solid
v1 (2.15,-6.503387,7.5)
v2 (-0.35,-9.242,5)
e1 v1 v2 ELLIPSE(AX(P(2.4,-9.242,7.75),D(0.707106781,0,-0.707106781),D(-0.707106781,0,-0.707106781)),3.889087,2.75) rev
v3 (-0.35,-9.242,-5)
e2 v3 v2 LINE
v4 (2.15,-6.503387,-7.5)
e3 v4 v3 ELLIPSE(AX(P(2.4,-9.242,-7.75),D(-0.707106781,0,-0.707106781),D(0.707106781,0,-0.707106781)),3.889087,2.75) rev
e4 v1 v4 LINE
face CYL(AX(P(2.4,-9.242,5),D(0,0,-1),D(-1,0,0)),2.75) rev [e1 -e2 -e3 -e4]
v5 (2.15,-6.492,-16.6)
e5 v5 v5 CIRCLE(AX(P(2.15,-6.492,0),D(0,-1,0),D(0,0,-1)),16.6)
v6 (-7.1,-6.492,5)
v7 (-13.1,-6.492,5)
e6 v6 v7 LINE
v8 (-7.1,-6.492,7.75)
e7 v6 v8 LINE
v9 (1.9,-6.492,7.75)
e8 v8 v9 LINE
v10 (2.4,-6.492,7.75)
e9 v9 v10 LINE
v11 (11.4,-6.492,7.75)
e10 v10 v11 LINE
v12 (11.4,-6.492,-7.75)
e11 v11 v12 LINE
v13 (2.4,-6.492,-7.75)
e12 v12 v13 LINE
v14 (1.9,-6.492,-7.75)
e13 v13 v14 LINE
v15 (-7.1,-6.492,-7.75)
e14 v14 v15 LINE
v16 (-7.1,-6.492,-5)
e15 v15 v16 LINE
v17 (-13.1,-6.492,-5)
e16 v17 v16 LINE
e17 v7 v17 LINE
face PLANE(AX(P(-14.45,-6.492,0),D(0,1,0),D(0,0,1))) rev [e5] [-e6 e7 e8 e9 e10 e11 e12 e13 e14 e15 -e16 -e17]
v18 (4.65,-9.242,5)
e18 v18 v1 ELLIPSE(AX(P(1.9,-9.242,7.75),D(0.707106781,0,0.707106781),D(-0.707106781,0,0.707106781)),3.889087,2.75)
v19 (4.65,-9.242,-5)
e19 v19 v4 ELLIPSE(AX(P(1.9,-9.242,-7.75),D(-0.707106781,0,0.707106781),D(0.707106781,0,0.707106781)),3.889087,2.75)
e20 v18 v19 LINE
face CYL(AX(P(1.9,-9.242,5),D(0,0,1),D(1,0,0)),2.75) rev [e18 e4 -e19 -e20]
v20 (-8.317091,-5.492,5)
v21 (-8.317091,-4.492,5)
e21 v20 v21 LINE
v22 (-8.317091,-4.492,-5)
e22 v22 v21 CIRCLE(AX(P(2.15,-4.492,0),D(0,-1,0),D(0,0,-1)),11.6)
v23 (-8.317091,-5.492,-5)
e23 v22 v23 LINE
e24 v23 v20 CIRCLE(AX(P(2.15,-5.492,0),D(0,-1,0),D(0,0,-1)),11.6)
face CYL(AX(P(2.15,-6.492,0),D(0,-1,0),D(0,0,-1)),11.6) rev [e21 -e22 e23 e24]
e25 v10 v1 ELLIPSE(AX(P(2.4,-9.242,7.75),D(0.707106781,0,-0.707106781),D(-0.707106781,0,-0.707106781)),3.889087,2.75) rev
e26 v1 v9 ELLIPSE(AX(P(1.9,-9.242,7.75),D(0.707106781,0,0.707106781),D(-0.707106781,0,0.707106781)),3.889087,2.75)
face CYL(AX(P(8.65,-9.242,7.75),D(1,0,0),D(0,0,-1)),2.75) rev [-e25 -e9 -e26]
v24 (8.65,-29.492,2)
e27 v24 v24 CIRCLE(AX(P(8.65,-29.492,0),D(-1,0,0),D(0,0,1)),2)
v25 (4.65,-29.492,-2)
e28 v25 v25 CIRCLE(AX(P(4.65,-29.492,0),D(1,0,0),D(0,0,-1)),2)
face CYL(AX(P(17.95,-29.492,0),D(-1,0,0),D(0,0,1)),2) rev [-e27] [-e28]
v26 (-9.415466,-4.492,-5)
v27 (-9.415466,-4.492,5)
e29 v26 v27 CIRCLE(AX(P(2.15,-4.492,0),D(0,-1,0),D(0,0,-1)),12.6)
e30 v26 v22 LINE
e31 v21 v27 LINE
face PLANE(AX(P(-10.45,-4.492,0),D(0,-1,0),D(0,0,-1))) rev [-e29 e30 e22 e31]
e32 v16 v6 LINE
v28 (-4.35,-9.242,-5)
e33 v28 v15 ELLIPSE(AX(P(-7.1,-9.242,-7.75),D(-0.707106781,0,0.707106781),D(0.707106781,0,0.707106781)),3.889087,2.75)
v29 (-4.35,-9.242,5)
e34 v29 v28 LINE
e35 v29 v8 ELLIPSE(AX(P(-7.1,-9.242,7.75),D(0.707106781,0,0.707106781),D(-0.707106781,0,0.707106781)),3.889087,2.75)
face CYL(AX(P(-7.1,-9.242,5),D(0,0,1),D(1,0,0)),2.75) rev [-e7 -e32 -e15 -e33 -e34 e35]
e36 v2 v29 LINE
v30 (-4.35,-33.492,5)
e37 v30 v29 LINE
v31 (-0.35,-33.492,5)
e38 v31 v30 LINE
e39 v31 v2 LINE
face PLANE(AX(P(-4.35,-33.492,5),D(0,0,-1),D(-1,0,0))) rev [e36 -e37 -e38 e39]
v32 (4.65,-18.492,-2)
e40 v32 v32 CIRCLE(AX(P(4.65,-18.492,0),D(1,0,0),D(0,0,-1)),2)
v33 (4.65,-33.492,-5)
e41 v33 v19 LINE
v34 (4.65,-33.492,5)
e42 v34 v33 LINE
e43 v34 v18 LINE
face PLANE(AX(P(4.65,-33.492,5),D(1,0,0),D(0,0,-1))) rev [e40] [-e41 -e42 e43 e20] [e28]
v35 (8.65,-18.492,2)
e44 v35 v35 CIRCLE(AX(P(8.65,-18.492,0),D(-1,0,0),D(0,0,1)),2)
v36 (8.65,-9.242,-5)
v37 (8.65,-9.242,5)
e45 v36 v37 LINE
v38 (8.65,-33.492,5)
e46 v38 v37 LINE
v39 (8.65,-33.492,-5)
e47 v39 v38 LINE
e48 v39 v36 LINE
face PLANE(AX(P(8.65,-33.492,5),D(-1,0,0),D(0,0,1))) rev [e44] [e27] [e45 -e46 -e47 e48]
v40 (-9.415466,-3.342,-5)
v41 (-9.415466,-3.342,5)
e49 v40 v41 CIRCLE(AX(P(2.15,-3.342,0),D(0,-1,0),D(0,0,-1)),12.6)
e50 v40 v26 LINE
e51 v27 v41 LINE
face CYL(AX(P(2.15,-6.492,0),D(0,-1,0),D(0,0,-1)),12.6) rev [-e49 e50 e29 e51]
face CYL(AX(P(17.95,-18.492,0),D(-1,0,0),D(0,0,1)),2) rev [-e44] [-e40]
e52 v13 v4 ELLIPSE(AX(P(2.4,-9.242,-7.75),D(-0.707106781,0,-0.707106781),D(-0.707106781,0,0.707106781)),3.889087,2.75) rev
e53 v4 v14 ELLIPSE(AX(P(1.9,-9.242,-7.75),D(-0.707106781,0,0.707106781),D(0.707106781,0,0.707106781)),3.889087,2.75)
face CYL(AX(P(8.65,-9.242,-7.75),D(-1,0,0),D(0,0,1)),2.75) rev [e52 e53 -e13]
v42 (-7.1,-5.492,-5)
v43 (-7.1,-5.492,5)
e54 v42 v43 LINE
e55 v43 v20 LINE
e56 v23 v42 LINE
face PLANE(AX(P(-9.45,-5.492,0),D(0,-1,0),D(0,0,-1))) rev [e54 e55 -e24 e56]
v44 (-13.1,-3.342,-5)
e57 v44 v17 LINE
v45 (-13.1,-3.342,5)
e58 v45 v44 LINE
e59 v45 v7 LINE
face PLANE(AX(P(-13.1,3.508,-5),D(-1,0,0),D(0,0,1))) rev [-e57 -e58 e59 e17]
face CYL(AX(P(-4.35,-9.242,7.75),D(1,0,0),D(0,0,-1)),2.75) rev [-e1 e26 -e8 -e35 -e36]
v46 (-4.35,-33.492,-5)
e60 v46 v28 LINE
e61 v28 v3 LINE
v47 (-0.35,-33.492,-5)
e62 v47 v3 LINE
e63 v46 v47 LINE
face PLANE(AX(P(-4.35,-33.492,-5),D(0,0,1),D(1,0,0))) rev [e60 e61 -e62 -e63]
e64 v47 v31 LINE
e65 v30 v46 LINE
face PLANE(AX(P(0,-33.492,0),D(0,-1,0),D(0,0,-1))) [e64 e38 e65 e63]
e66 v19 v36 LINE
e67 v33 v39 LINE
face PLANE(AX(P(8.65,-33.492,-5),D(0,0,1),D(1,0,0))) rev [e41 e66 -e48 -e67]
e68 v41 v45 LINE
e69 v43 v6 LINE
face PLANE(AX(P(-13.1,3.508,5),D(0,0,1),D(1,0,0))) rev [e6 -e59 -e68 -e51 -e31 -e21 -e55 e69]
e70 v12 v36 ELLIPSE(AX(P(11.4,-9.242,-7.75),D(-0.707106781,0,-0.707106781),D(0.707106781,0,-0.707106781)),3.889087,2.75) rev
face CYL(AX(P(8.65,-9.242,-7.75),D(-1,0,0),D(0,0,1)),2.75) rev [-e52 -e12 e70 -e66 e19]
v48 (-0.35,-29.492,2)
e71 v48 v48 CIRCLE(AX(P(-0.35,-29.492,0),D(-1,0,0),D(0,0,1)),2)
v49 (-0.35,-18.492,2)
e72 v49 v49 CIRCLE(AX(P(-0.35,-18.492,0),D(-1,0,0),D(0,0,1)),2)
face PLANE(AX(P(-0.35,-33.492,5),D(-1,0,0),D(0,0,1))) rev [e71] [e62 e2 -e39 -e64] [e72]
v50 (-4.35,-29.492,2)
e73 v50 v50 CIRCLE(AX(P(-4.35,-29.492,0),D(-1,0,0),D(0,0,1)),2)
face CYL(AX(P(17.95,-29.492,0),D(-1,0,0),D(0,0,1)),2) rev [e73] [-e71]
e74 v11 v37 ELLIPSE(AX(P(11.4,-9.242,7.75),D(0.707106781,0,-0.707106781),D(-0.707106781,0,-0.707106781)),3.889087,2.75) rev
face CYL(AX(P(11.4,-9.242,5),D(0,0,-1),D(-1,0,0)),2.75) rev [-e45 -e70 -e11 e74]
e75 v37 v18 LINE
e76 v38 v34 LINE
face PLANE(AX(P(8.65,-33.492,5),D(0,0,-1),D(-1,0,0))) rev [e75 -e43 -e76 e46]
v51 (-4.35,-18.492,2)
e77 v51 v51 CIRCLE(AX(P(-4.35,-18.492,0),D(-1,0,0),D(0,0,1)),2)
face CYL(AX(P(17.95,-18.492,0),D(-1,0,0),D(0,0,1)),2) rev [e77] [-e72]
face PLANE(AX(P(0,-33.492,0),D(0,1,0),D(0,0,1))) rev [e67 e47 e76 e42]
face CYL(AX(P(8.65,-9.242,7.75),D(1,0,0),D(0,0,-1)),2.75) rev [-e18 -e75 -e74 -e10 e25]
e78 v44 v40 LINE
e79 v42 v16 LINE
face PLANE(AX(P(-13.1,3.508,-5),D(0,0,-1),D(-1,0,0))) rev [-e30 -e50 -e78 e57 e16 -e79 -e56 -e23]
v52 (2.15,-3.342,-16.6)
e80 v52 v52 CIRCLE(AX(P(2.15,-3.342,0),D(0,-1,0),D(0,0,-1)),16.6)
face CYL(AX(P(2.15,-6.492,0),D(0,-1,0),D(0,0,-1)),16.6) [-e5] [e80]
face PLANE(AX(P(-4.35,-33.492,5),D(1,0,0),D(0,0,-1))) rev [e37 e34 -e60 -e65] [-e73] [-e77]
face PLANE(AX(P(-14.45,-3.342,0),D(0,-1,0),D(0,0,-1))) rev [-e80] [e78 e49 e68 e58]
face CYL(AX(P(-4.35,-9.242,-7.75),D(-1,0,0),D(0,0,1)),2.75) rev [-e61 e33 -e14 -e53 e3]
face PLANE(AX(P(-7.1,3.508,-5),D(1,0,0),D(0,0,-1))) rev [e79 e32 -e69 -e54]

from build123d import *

# Parameters (mm, degrees)
SKETCH2_W           = 4
SKETCH2_H           = 10
BOSS_EXTRUDE1_DEPTH = 27
SKETCH3_R           = 2
CUT_EXTRUDE1_DEPTH  = 22.3
FILLET1_R           = 2.75
SKETCH6_W           = 6
SKETCH6_H           = 10
CUT_EXTRUDE4_DEPTH  = 10


with BuildPart() as part:
    # Sketch1 → Revolve1 (revolve)
    with BuildSketch(Plane.XY, mode=Mode.PRIVATE) as revolve1_sk:
        Polygon((-14.45, -3.342), (-10.45, -3.342), (-10.45, -4.492), (-9.45, -4.492), (-9.45, -5.492), (2.15, -5.492), (2.15, -6.492), (-14.45, -6.492), align=None)
    revolve(revolve1_sk.sketch.rotate(Axis((2.15, -6.492, 0), (0, 1, 0)), 270), axis=Axis((2.15, -6.492, 0), (0, 1, 0)))

    # Sketch2 → Boss-Extrude1 (add)
    with BuildSketch(Plane.XZ.offset(6.492)):
        with Locations((6.65, 0)):
            Rectangle(SKETCH2_W, SKETCH2_H)
        with Locations((-2.35, 0)):
            Rectangle(SKETCH2_W, SKETCH2_H)
    extrude(amount=BOSS_EXTRUDE1_DEPTH)

    # Sketch3 → Cut-Extrude1 (cut)
    with BuildSketch(Plane.ZY.offset(4.35)):
        with Locations((0, -29.492)):
            Circle(SKETCH3_R)
        with Locations((0, -18.492)):
            Circle(SKETCH3_R)
    extrude(amount=-CUT_EXTRUDE1_DEPTH, mode=Mode.SUBTRACT)

    # Fillet1
    # the kernel refuses this fillet: 2.75 mm, written as the material it adds along each edge
    with BuildSketch(Plane(origin=(-4.35, -6.492, -5), x_dir=(-1, 0, 0), z_dir=(0, 0, 1)), Plane(origin=(-0.35, -6.492, 5), x_dir=(1, 0, 0), z_dir=(0, 0, -1)), Plane(origin=(8.65, -6.492, 5), x_dir=(1, 0, 0), z_dir=(0, 0, -1)), Plane(origin=(4.65, -6.492, -5), x_dir=(-1, 0, 0), z_dir=(0, 0, 1))) as fillet1_piece_1:
        with BuildLine():
            CenterArc((FILLET1_R, FILLET1_R), FILLET1_R, 180, 90)
            Line((0, FILLET1_R), (0, 0))
            Line((0, 0), (FILLET1_R, 0))
        make_face()
    extrude(amount=10)
    with BuildSketch(Plane(origin=(6.525, -6.492, -5), x_dir=(0, 0, -1), z_dir=(-1, 0, 0))) as fillet1_piece_2_section:
        with BuildLine():
            CenterArc((FILLET1_R, FILLET1_R), FILLET1_R, 180, 90)
            Line((0, FILLET1_R), (0, 0))
            Line((0, 0), (FILLET1_R, 0))
        make_face()
    fillet1_piece_2 = extrude(amount=10.875, mode=Mode.PRIVATE)
    fillet1_piece_2 = split(fillet1_piece_2, bisect_by=Plane(origin=(4.65, -7.114586564, -5.622586564), z_dir=(1, 0, 0)), keep=Keep.TOP, mode=Mode.PRIVATE)
    add(fillet1_piece_2)
    with BuildSketch(Plane(origin=(-0.35, -6.492, -5), x_dir=(0, 0, -1), z_dir=(-1, 0, 0)), Plane(origin=(-4.35, -6.492, 5), x_dir=(0, 0, 1), z_dir=(1, 0, 0)), Plane(origin=(4.65, -6.492, 5), x_dir=(0, 0, 1), z_dir=(1, 0, 0)), Plane(origin=(8.65, -6.492, -5), x_dir=(0, 0, -1), z_dir=(-1, 0, 0))) as fillet1_piece_3:
        with BuildLine():
            CenterArc((FILLET1_R, FILLET1_R), FILLET1_R, 180, 90)
            Line((0, FILLET1_R), (0, 0))
            Line((0, 0), (FILLET1_R, 0))
        make_face()
    extrude(amount=4)
    with BuildSketch(Plane(origin=(-4.35, -6.492, 5), x_dir=(0, 0, 1), z_dir=(1, 0, 0))) as fillet1_piece_4_section:
        with BuildLine():
            CenterArc((FILLET1_R, FILLET1_R), FILLET1_R, 180, 90)
            Line((0, FILLET1_R), (0, 0))
            Line((0, 0), (FILLET1_R, 0))
        make_face()
    fillet1_piece_4 = extrude(amount=10.875, mode=Mode.PRIVATE)
    fillet1_piece_4 = split(fillet1_piece_4, bisect_by=Plane(origin=(4.65, -7.114586564, 5.622586564), z_dir=(1, 0, 0)), keep=Keep.TOP, mode=Mode.PRIVATE)
    add(fillet1_piece_4)
    with BuildSketch(Plane(origin=(-2.225, -6.492, 5), x_dir=(0, 0, 1), z_dir=(1, 0, 0))) as fillet1_piece_5_section:
        with BuildLine():
            CenterArc((FILLET1_R, FILLET1_R), FILLET1_R, 180, 90)
            Line((0, FILLET1_R), (0, 0))
            Line((0, 0), (FILLET1_R, 0))
        make_face()
    fillet1_piece_5 = extrude(amount=10.875, mode=Mode.PRIVATE)
    fillet1_piece_5 = split(fillet1_piece_5, bisect_by=Plane(origin=(-0.35, -7.114586564, 5.622586564), z_dir=(-1, 0, 0)), keep=Keep.TOP, mode=Mode.PRIVATE)
    add(fillet1_piece_5)
    with BuildSketch(Plane(origin=(8.65, -6.492, -5), x_dir=(0, 0, -1), z_dir=(-1, 0, 0))) as fillet1_piece_6_section:
        with BuildLine():
            CenterArc((FILLET1_R, FILLET1_R), FILLET1_R, 180, 90)
            Line((0, FILLET1_R), (0, 0))
            Line((0, 0), (FILLET1_R, 0))
        make_face()
    fillet1_piece_6 = extrude(amount=10.875, mode=Mode.PRIVATE)
    fillet1_piece_6 = split(fillet1_piece_6, bisect_by=Plane(origin=(-0.35, -7.114586564, -5.622586564), z_dir=(-1, 0, 0)), keep=Keep.TOP, mode=Mode.PRIVATE)
    add(fillet1_piece_6)
    with BuildSketch(Plane(origin=(-4.35, -6.492, -11.875), x_dir=(-1, 0, 0), z_dir=(0, 0, 1))) as fillet1_piece_7a_section:
        with BuildLine():
            CenterArc((FILLET1_R, FILLET1_R), FILLET1_R, 180, 90)
            Line((0, FILLET1_R), (0, 0))
            Line((0, 0), (FILLET1_R, 0))
        make_face()
    fillet1_piece_7a = extrude(amount=16.875, mode=Mode.PRIVATE)
    fillet1_piece_7a = split(fillet1_piece_7a, bisect_by=Plane(origin=(-4.972586564, -7.114586564, -5), z_dir=(0, 0, -1)), keep=Keep.TOP, mode=Mode.PRIVATE)
    with BuildSketch(Plane(origin=(-0.35, -6.492, -5), x_dir=(0, 0, -1), z_dir=(-1, 0, 0))) as fillet1_piece_7b_section:
        with BuildLine():
            CenterArc((FILLET1_R, FILLET1_R), FILLET1_R, 180, 90)
            Line((0, FILLET1_R), (0, 0))
            Line((0, 0), (FILLET1_R, 0))
        make_face()
    fillet1_piece_7b = extrude(amount=10.875, mode=Mode.PRIVATE)
    fillet1_piece_7b = split(fillet1_piece_7b, bisect_by=Plane(origin=(-4.35, -7.114586564, -5.622586564), z_dir=(-1, 0, 0)), keep=Keep.TOP, mode=Mode.PRIVATE)
    fillet1_piece_7 = fillet1_piece_7a & fillet1_piece_7b
    add(fillet1_piece_7)
    with BuildSketch(Plane(origin=(-4.35, -6.492, -5), x_dir=(-1, 0, 0), z_dir=(0, 0, 1))) as fillet1_piece_8a_section:
        with BuildLine():
            CenterArc((FILLET1_R, FILLET1_R), FILLET1_R, 180, 90)
            Line((0, FILLET1_R), (0, 0))
            Line((0, 0), (FILLET1_R, 0))
        make_face()
    fillet1_piece_8a = extrude(amount=16.875, mode=Mode.PRIVATE)
    fillet1_piece_8a = split(fillet1_piece_8a, bisect_by=Plane(origin=(-4.972586564, -7.114586564, 5), z_dir=(0, 0, 1)), keep=Keep.TOP, mode=Mode.PRIVATE)
    with BuildSketch(Plane(origin=(-11.225, -6.492, 5), x_dir=(0, 0, 1), z_dir=(1, 0, 0))) as fillet1_piece_8b_section:
        with BuildLine():
            CenterArc((FILLET1_R, FILLET1_R), FILLET1_R, 180, 90)
            Line((0, FILLET1_R), (0, 0))
            Line((0, 0), (FILLET1_R, 0))
        make_face()
    fillet1_piece_8b = extrude(amount=10.875, mode=Mode.PRIVATE)
    fillet1_piece_8b = split(fillet1_piece_8b, bisect_by=Plane(origin=(-4.35, -7.114586564, 5.622586564), z_dir=(-1, 0, 0)), keep=Keep.TOP, mode=Mode.PRIVATE)
    fillet1_piece_8 = fillet1_piece_8a & fillet1_piece_8b
    add(fillet1_piece_8)
    with BuildSketch(Plane(origin=(6.525, -6.492, -5), x_dir=(0, 0, -1), z_dir=(-1, 0, 0))) as fillet1_piece_9a_section:
        with BuildLine():
            CenterArc((FILLET1_R, FILLET1_R), FILLET1_R, 180, 90)
            Line((0, FILLET1_R), (0, 0))
            Line((0, 0), (FILLET1_R, 0))
        make_face()
    fillet1_piece_9a = extrude(amount=10.875, mode=Mode.PRIVATE)
    fillet1_piece_9a = split(fillet1_piece_9a, bisect_by=Plane(origin=(4.65, -7.114586564, -5.622586564), z_dir=(-1, 0, 0)), keep=Keep.TOP, mode=Mode.PRIVATE)
    fillet1_piece_9a = split(fillet1_piece_9a, bisect_by=Plane(origin=(-0.35, -7.114586564, -5.622586564), z_dir=(1, 0, 0)), keep=Keep.TOP, mode=Mode.PRIVATE)
    with BuildSketch(Plane(origin=(-0.35, -6.492, 5), x_dir=(1, 0, 0), z_dir=(0, 0, -1))) as fillet1_piece_9b_section:
        with BuildLine():
            CenterArc((FILLET1_R, FILLET1_R), FILLET1_R, 180, 90)
            Line((0, FILLET1_R), (0, 0))
            Line((0, 0), (FILLET1_R, 0))
        make_face()
    fillet1_piece_9b = extrude(amount=16.875, mode=Mode.PRIVATE)
    fillet1_piece_9b = split(fillet1_piece_9b, bisect_by=Plane(origin=(0.272586564, -7.114586564, -5), z_dir=(0, 0, -1)), keep=Keep.TOP, mode=Mode.PRIVATE)
    fillet1_piece_9 = fillet1_piece_9a & fillet1_piece_9b
    add(fillet1_piece_9)
    with BuildSketch(Plane(origin=(-0.35, -6.492, 11.875), x_dir=(1, 0, 0), z_dir=(0, 0, -1))) as fillet1_piece_10a_section:
        with BuildLine():
            CenterArc((FILLET1_R, FILLET1_R), FILLET1_R, 180, 90)
            Line((0, FILLET1_R), (0, 0))
            Line((0, 0), (FILLET1_R, 0))
        make_face()
    fillet1_piece_10a = extrude(amount=16.875, mode=Mode.PRIVATE)
    fillet1_piece_10a = split(fillet1_piece_10a, bisect_by=Plane(origin=(0.272586564, -7.114586564, 5), z_dir=(0, 0, 1)), keep=Keep.TOP, mode=Mode.PRIVATE)
    with BuildSketch(Plane(origin=(-4.35, -6.492, 5), x_dir=(0, 0, 1), z_dir=(1, 0, 0))) as fillet1_piece_10b_section:
        with BuildLine():
            CenterArc((FILLET1_R, FILLET1_R), FILLET1_R, 180, 90)
            Line((0, FILLET1_R), (0, 0))
            Line((0, 0), (FILLET1_R, 0))
        make_face()
    fillet1_piece_10b = extrude(amount=10.875, mode=Mode.PRIVATE)
    fillet1_piece_10b = split(fillet1_piece_10b, bisect_by=Plane(origin=(4.65, -7.114586564, 5.622586564), z_dir=(-1, 0, 0)), keep=Keep.TOP, mode=Mode.PRIVATE)
    fillet1_piece_10b = split(fillet1_piece_10b, bisect_by=Plane(origin=(-0.35, -7.114586564, 5.622586564), z_dir=(1, 0, 0)), keep=Keep.TOP, mode=Mode.PRIVATE)
    fillet1_piece_10 = fillet1_piece_10a & fillet1_piece_10b
    add(fillet1_piece_10)
    with BuildSketch(Plane(origin=(8.65, -6.492, 11.875), x_dir=(1, 0, 0), z_dir=(0, 0, -1))) as fillet1_piece_11a_section:
        with BuildLine():
            CenterArc((FILLET1_R, FILLET1_R), FILLET1_R, 180, 90)
            Line((0, FILLET1_R), (0, 0))
            Line((0, 0), (FILLET1_R, 0))
        make_face()
    fillet1_piece_11a = extrude(amount=16.875, mode=Mode.PRIVATE)
    fillet1_piece_11a = split(fillet1_piece_11a, bisect_by=Plane(origin=(9.272586564, -7.114586564, 5), z_dir=(0, 0, 1)), keep=Keep.TOP, mode=Mode.PRIVATE)
    with BuildSketch(Plane(origin=(4.65, -6.492, 5), x_dir=(0, 0, 1), z_dir=(1, 0, 0))) as fillet1_piece_11b_section:
        with BuildLine():
            CenterArc((FILLET1_R, FILLET1_R), FILLET1_R, 180, 90)
            Line((0, FILLET1_R), (0, 0))
            Line((0, 0), (FILLET1_R, 0))
        make_face()
    fillet1_piece_11b = extrude(amount=10.875, mode=Mode.PRIVATE)
    fillet1_piece_11b = split(fillet1_piece_11b, bisect_by=Plane(origin=(8.65, -7.114586564, 5.622586564), z_dir=(1, 0, 0)), keep=Keep.TOP, mode=Mode.PRIVATE)
    fillet1_piece_11 = fillet1_piece_11a & fillet1_piece_11b
    add(fillet1_piece_11)
    with BuildSketch(Plane(origin=(8.65, -6.492, 5), x_dir=(1, 0, 0), z_dir=(0, 0, -1))) as fillet1_piece_12a_section:
        with BuildLine():
            CenterArc((FILLET1_R, FILLET1_R), FILLET1_R, 180, 90)
            Line((0, FILLET1_R), (0, 0))
            Line((0, 0), (FILLET1_R, 0))
        make_face()
    fillet1_piece_12a = extrude(amount=16.875, mode=Mode.PRIVATE)
    fillet1_piece_12a = split(fillet1_piece_12a, bisect_by=Plane(origin=(9.272586564, -7.114586564, -5), z_dir=(0, 0, -1)), keep=Keep.TOP, mode=Mode.PRIVATE)
    with BuildSketch(Plane(origin=(15.525, -6.492, -5), x_dir=(0, 0, -1), z_dir=(-1, 0, 0))) as fillet1_piece_12b_section:
        with BuildLine():
            CenterArc((FILLET1_R, FILLET1_R), FILLET1_R, 180, 90)
            Line((0, FILLET1_R), (0, 0))
            Line((0, 0), (FILLET1_R, 0))
        make_face()
    fillet1_piece_12b = extrude(amount=10.875, mode=Mode.PRIVATE)
    fillet1_piece_12b = split(fillet1_piece_12b, bisect_by=Plane(origin=(8.65, -7.114586564, -5.622586564), z_dir=(1, 0, 0)), keep=Keep.TOP, mode=Mode.PRIVATE)
    fillet1_piece_12 = fillet1_piece_12a & fillet1_piece_12b
    add(fillet1_piece_12)
    with BuildSketch(Plane(origin=(-2.225, -6.492, 5), x_dir=(0, 0, 1), z_dir=(1, 0, 0))) as fillet1_piece_13a_section:
        with BuildLine():
            CenterArc((FILLET1_R, FILLET1_R), FILLET1_R, 180, 90)
            Line((0, FILLET1_R), (0, 0))
            Line((0, 0), (FILLET1_R, 0))
        make_face()
    fillet1_piece_13a = extrude(amount=10.875, mode=Mode.PRIVATE)
    fillet1_piece_13a = split(fillet1_piece_13a, bisect_by=Plane(origin=(4.65, -7.114586564, 5.622586564), z_dir=(-1, 0, 0)), keep=Keep.TOP, mode=Mode.PRIVATE)
    fillet1_piece_13a = split(fillet1_piece_13a, bisect_by=Plane(origin=(-0.35, -7.114586564, 5.622586564), z_dir=(1, 0, 0)), keep=Keep.TOP, mode=Mode.PRIVATE)
    with BuildSketch(Plane(origin=(4.65, -6.492, -5), x_dir=(-1, 0, 0), z_dir=(0, 0, 1))) as fillet1_piece_13b_section:
        with BuildLine():
            CenterArc((FILLET1_R, FILLET1_R), FILLET1_R, 180, 90)
            Line((0, FILLET1_R), (0, 0))
            Line((0, 0), (FILLET1_R, 0))
        make_face()
    fillet1_piece_13b = extrude(amount=16.875, mode=Mode.PRIVATE)
    fillet1_piece_13b = split(fillet1_piece_13b, bisect_by=Plane(origin=(4.027413436, -7.114586564, 5), z_dir=(0, 0, 1)), keep=Keep.TOP, mode=Mode.PRIVATE)
    fillet1_piece_13 = fillet1_piece_13a & fillet1_piece_13b
    add(fillet1_piece_13)
    with BuildSketch(Plane(origin=(4.65, -6.492, -11.875), x_dir=(-1, 0, 0), z_dir=(0, 0, 1))) as fillet1_piece_14a_section:
        with BuildLine():
            CenterArc((FILLET1_R, FILLET1_R), FILLET1_R, 180, 90)
            Line((0, FILLET1_R), (0, 0))
            Line((0, 0), (FILLET1_R, 0))
        make_face()
    fillet1_piece_14a = extrude(amount=16.875, mode=Mode.PRIVATE)
    fillet1_piece_14a = split(fillet1_piece_14a, bisect_by=Plane(origin=(4.027413436, -7.114586564, -5), z_dir=(0, 0, -1)), keep=Keep.TOP, mode=Mode.PRIVATE)
    with BuildSketch(Plane(origin=(8.65, -6.492, -5), x_dir=(0, 0, -1), z_dir=(-1, 0, 0))) as fillet1_piece_14b_section:
        with BuildLine():
            CenterArc((FILLET1_R, FILLET1_R), FILLET1_R, 180, 90)
            Line((0, FILLET1_R), (0, 0))
            Line((0, 0), (FILLET1_R, 0))
        make_face()
    fillet1_piece_14b = extrude(amount=10.875, mode=Mode.PRIVATE)
    fillet1_piece_14b = split(fillet1_piece_14b, bisect_by=Plane(origin=(4.65, -7.114586564, -5.622586564), z_dir=(-1, 0, 0)), keep=Keep.TOP, mode=Mode.PRIVATE)
    fillet1_piece_14b = split(fillet1_piece_14b, bisect_by=Plane(origin=(-0.35, -7.114586564, -5.622586564), z_dir=(1, 0, 0)), keep=Keep.TOP, mode=Mode.PRIVATE)
    fillet1_piece_14 = fillet1_piece_14a & fillet1_piece_14b
    add(fillet1_piece_14)

    # Sketch6 → Cut-Extrude4 (cut)
    with BuildSketch(Plane.XZ.offset(6.492)):
        with Locations((-10.1, 0)):
            Rectangle(SKETCH6_W, SKETCH6_H)
    extrude(amount=-CUT_EXTRUDE4_DEPTH, mode=Mode.SUBTRACT)


solid = part.part
